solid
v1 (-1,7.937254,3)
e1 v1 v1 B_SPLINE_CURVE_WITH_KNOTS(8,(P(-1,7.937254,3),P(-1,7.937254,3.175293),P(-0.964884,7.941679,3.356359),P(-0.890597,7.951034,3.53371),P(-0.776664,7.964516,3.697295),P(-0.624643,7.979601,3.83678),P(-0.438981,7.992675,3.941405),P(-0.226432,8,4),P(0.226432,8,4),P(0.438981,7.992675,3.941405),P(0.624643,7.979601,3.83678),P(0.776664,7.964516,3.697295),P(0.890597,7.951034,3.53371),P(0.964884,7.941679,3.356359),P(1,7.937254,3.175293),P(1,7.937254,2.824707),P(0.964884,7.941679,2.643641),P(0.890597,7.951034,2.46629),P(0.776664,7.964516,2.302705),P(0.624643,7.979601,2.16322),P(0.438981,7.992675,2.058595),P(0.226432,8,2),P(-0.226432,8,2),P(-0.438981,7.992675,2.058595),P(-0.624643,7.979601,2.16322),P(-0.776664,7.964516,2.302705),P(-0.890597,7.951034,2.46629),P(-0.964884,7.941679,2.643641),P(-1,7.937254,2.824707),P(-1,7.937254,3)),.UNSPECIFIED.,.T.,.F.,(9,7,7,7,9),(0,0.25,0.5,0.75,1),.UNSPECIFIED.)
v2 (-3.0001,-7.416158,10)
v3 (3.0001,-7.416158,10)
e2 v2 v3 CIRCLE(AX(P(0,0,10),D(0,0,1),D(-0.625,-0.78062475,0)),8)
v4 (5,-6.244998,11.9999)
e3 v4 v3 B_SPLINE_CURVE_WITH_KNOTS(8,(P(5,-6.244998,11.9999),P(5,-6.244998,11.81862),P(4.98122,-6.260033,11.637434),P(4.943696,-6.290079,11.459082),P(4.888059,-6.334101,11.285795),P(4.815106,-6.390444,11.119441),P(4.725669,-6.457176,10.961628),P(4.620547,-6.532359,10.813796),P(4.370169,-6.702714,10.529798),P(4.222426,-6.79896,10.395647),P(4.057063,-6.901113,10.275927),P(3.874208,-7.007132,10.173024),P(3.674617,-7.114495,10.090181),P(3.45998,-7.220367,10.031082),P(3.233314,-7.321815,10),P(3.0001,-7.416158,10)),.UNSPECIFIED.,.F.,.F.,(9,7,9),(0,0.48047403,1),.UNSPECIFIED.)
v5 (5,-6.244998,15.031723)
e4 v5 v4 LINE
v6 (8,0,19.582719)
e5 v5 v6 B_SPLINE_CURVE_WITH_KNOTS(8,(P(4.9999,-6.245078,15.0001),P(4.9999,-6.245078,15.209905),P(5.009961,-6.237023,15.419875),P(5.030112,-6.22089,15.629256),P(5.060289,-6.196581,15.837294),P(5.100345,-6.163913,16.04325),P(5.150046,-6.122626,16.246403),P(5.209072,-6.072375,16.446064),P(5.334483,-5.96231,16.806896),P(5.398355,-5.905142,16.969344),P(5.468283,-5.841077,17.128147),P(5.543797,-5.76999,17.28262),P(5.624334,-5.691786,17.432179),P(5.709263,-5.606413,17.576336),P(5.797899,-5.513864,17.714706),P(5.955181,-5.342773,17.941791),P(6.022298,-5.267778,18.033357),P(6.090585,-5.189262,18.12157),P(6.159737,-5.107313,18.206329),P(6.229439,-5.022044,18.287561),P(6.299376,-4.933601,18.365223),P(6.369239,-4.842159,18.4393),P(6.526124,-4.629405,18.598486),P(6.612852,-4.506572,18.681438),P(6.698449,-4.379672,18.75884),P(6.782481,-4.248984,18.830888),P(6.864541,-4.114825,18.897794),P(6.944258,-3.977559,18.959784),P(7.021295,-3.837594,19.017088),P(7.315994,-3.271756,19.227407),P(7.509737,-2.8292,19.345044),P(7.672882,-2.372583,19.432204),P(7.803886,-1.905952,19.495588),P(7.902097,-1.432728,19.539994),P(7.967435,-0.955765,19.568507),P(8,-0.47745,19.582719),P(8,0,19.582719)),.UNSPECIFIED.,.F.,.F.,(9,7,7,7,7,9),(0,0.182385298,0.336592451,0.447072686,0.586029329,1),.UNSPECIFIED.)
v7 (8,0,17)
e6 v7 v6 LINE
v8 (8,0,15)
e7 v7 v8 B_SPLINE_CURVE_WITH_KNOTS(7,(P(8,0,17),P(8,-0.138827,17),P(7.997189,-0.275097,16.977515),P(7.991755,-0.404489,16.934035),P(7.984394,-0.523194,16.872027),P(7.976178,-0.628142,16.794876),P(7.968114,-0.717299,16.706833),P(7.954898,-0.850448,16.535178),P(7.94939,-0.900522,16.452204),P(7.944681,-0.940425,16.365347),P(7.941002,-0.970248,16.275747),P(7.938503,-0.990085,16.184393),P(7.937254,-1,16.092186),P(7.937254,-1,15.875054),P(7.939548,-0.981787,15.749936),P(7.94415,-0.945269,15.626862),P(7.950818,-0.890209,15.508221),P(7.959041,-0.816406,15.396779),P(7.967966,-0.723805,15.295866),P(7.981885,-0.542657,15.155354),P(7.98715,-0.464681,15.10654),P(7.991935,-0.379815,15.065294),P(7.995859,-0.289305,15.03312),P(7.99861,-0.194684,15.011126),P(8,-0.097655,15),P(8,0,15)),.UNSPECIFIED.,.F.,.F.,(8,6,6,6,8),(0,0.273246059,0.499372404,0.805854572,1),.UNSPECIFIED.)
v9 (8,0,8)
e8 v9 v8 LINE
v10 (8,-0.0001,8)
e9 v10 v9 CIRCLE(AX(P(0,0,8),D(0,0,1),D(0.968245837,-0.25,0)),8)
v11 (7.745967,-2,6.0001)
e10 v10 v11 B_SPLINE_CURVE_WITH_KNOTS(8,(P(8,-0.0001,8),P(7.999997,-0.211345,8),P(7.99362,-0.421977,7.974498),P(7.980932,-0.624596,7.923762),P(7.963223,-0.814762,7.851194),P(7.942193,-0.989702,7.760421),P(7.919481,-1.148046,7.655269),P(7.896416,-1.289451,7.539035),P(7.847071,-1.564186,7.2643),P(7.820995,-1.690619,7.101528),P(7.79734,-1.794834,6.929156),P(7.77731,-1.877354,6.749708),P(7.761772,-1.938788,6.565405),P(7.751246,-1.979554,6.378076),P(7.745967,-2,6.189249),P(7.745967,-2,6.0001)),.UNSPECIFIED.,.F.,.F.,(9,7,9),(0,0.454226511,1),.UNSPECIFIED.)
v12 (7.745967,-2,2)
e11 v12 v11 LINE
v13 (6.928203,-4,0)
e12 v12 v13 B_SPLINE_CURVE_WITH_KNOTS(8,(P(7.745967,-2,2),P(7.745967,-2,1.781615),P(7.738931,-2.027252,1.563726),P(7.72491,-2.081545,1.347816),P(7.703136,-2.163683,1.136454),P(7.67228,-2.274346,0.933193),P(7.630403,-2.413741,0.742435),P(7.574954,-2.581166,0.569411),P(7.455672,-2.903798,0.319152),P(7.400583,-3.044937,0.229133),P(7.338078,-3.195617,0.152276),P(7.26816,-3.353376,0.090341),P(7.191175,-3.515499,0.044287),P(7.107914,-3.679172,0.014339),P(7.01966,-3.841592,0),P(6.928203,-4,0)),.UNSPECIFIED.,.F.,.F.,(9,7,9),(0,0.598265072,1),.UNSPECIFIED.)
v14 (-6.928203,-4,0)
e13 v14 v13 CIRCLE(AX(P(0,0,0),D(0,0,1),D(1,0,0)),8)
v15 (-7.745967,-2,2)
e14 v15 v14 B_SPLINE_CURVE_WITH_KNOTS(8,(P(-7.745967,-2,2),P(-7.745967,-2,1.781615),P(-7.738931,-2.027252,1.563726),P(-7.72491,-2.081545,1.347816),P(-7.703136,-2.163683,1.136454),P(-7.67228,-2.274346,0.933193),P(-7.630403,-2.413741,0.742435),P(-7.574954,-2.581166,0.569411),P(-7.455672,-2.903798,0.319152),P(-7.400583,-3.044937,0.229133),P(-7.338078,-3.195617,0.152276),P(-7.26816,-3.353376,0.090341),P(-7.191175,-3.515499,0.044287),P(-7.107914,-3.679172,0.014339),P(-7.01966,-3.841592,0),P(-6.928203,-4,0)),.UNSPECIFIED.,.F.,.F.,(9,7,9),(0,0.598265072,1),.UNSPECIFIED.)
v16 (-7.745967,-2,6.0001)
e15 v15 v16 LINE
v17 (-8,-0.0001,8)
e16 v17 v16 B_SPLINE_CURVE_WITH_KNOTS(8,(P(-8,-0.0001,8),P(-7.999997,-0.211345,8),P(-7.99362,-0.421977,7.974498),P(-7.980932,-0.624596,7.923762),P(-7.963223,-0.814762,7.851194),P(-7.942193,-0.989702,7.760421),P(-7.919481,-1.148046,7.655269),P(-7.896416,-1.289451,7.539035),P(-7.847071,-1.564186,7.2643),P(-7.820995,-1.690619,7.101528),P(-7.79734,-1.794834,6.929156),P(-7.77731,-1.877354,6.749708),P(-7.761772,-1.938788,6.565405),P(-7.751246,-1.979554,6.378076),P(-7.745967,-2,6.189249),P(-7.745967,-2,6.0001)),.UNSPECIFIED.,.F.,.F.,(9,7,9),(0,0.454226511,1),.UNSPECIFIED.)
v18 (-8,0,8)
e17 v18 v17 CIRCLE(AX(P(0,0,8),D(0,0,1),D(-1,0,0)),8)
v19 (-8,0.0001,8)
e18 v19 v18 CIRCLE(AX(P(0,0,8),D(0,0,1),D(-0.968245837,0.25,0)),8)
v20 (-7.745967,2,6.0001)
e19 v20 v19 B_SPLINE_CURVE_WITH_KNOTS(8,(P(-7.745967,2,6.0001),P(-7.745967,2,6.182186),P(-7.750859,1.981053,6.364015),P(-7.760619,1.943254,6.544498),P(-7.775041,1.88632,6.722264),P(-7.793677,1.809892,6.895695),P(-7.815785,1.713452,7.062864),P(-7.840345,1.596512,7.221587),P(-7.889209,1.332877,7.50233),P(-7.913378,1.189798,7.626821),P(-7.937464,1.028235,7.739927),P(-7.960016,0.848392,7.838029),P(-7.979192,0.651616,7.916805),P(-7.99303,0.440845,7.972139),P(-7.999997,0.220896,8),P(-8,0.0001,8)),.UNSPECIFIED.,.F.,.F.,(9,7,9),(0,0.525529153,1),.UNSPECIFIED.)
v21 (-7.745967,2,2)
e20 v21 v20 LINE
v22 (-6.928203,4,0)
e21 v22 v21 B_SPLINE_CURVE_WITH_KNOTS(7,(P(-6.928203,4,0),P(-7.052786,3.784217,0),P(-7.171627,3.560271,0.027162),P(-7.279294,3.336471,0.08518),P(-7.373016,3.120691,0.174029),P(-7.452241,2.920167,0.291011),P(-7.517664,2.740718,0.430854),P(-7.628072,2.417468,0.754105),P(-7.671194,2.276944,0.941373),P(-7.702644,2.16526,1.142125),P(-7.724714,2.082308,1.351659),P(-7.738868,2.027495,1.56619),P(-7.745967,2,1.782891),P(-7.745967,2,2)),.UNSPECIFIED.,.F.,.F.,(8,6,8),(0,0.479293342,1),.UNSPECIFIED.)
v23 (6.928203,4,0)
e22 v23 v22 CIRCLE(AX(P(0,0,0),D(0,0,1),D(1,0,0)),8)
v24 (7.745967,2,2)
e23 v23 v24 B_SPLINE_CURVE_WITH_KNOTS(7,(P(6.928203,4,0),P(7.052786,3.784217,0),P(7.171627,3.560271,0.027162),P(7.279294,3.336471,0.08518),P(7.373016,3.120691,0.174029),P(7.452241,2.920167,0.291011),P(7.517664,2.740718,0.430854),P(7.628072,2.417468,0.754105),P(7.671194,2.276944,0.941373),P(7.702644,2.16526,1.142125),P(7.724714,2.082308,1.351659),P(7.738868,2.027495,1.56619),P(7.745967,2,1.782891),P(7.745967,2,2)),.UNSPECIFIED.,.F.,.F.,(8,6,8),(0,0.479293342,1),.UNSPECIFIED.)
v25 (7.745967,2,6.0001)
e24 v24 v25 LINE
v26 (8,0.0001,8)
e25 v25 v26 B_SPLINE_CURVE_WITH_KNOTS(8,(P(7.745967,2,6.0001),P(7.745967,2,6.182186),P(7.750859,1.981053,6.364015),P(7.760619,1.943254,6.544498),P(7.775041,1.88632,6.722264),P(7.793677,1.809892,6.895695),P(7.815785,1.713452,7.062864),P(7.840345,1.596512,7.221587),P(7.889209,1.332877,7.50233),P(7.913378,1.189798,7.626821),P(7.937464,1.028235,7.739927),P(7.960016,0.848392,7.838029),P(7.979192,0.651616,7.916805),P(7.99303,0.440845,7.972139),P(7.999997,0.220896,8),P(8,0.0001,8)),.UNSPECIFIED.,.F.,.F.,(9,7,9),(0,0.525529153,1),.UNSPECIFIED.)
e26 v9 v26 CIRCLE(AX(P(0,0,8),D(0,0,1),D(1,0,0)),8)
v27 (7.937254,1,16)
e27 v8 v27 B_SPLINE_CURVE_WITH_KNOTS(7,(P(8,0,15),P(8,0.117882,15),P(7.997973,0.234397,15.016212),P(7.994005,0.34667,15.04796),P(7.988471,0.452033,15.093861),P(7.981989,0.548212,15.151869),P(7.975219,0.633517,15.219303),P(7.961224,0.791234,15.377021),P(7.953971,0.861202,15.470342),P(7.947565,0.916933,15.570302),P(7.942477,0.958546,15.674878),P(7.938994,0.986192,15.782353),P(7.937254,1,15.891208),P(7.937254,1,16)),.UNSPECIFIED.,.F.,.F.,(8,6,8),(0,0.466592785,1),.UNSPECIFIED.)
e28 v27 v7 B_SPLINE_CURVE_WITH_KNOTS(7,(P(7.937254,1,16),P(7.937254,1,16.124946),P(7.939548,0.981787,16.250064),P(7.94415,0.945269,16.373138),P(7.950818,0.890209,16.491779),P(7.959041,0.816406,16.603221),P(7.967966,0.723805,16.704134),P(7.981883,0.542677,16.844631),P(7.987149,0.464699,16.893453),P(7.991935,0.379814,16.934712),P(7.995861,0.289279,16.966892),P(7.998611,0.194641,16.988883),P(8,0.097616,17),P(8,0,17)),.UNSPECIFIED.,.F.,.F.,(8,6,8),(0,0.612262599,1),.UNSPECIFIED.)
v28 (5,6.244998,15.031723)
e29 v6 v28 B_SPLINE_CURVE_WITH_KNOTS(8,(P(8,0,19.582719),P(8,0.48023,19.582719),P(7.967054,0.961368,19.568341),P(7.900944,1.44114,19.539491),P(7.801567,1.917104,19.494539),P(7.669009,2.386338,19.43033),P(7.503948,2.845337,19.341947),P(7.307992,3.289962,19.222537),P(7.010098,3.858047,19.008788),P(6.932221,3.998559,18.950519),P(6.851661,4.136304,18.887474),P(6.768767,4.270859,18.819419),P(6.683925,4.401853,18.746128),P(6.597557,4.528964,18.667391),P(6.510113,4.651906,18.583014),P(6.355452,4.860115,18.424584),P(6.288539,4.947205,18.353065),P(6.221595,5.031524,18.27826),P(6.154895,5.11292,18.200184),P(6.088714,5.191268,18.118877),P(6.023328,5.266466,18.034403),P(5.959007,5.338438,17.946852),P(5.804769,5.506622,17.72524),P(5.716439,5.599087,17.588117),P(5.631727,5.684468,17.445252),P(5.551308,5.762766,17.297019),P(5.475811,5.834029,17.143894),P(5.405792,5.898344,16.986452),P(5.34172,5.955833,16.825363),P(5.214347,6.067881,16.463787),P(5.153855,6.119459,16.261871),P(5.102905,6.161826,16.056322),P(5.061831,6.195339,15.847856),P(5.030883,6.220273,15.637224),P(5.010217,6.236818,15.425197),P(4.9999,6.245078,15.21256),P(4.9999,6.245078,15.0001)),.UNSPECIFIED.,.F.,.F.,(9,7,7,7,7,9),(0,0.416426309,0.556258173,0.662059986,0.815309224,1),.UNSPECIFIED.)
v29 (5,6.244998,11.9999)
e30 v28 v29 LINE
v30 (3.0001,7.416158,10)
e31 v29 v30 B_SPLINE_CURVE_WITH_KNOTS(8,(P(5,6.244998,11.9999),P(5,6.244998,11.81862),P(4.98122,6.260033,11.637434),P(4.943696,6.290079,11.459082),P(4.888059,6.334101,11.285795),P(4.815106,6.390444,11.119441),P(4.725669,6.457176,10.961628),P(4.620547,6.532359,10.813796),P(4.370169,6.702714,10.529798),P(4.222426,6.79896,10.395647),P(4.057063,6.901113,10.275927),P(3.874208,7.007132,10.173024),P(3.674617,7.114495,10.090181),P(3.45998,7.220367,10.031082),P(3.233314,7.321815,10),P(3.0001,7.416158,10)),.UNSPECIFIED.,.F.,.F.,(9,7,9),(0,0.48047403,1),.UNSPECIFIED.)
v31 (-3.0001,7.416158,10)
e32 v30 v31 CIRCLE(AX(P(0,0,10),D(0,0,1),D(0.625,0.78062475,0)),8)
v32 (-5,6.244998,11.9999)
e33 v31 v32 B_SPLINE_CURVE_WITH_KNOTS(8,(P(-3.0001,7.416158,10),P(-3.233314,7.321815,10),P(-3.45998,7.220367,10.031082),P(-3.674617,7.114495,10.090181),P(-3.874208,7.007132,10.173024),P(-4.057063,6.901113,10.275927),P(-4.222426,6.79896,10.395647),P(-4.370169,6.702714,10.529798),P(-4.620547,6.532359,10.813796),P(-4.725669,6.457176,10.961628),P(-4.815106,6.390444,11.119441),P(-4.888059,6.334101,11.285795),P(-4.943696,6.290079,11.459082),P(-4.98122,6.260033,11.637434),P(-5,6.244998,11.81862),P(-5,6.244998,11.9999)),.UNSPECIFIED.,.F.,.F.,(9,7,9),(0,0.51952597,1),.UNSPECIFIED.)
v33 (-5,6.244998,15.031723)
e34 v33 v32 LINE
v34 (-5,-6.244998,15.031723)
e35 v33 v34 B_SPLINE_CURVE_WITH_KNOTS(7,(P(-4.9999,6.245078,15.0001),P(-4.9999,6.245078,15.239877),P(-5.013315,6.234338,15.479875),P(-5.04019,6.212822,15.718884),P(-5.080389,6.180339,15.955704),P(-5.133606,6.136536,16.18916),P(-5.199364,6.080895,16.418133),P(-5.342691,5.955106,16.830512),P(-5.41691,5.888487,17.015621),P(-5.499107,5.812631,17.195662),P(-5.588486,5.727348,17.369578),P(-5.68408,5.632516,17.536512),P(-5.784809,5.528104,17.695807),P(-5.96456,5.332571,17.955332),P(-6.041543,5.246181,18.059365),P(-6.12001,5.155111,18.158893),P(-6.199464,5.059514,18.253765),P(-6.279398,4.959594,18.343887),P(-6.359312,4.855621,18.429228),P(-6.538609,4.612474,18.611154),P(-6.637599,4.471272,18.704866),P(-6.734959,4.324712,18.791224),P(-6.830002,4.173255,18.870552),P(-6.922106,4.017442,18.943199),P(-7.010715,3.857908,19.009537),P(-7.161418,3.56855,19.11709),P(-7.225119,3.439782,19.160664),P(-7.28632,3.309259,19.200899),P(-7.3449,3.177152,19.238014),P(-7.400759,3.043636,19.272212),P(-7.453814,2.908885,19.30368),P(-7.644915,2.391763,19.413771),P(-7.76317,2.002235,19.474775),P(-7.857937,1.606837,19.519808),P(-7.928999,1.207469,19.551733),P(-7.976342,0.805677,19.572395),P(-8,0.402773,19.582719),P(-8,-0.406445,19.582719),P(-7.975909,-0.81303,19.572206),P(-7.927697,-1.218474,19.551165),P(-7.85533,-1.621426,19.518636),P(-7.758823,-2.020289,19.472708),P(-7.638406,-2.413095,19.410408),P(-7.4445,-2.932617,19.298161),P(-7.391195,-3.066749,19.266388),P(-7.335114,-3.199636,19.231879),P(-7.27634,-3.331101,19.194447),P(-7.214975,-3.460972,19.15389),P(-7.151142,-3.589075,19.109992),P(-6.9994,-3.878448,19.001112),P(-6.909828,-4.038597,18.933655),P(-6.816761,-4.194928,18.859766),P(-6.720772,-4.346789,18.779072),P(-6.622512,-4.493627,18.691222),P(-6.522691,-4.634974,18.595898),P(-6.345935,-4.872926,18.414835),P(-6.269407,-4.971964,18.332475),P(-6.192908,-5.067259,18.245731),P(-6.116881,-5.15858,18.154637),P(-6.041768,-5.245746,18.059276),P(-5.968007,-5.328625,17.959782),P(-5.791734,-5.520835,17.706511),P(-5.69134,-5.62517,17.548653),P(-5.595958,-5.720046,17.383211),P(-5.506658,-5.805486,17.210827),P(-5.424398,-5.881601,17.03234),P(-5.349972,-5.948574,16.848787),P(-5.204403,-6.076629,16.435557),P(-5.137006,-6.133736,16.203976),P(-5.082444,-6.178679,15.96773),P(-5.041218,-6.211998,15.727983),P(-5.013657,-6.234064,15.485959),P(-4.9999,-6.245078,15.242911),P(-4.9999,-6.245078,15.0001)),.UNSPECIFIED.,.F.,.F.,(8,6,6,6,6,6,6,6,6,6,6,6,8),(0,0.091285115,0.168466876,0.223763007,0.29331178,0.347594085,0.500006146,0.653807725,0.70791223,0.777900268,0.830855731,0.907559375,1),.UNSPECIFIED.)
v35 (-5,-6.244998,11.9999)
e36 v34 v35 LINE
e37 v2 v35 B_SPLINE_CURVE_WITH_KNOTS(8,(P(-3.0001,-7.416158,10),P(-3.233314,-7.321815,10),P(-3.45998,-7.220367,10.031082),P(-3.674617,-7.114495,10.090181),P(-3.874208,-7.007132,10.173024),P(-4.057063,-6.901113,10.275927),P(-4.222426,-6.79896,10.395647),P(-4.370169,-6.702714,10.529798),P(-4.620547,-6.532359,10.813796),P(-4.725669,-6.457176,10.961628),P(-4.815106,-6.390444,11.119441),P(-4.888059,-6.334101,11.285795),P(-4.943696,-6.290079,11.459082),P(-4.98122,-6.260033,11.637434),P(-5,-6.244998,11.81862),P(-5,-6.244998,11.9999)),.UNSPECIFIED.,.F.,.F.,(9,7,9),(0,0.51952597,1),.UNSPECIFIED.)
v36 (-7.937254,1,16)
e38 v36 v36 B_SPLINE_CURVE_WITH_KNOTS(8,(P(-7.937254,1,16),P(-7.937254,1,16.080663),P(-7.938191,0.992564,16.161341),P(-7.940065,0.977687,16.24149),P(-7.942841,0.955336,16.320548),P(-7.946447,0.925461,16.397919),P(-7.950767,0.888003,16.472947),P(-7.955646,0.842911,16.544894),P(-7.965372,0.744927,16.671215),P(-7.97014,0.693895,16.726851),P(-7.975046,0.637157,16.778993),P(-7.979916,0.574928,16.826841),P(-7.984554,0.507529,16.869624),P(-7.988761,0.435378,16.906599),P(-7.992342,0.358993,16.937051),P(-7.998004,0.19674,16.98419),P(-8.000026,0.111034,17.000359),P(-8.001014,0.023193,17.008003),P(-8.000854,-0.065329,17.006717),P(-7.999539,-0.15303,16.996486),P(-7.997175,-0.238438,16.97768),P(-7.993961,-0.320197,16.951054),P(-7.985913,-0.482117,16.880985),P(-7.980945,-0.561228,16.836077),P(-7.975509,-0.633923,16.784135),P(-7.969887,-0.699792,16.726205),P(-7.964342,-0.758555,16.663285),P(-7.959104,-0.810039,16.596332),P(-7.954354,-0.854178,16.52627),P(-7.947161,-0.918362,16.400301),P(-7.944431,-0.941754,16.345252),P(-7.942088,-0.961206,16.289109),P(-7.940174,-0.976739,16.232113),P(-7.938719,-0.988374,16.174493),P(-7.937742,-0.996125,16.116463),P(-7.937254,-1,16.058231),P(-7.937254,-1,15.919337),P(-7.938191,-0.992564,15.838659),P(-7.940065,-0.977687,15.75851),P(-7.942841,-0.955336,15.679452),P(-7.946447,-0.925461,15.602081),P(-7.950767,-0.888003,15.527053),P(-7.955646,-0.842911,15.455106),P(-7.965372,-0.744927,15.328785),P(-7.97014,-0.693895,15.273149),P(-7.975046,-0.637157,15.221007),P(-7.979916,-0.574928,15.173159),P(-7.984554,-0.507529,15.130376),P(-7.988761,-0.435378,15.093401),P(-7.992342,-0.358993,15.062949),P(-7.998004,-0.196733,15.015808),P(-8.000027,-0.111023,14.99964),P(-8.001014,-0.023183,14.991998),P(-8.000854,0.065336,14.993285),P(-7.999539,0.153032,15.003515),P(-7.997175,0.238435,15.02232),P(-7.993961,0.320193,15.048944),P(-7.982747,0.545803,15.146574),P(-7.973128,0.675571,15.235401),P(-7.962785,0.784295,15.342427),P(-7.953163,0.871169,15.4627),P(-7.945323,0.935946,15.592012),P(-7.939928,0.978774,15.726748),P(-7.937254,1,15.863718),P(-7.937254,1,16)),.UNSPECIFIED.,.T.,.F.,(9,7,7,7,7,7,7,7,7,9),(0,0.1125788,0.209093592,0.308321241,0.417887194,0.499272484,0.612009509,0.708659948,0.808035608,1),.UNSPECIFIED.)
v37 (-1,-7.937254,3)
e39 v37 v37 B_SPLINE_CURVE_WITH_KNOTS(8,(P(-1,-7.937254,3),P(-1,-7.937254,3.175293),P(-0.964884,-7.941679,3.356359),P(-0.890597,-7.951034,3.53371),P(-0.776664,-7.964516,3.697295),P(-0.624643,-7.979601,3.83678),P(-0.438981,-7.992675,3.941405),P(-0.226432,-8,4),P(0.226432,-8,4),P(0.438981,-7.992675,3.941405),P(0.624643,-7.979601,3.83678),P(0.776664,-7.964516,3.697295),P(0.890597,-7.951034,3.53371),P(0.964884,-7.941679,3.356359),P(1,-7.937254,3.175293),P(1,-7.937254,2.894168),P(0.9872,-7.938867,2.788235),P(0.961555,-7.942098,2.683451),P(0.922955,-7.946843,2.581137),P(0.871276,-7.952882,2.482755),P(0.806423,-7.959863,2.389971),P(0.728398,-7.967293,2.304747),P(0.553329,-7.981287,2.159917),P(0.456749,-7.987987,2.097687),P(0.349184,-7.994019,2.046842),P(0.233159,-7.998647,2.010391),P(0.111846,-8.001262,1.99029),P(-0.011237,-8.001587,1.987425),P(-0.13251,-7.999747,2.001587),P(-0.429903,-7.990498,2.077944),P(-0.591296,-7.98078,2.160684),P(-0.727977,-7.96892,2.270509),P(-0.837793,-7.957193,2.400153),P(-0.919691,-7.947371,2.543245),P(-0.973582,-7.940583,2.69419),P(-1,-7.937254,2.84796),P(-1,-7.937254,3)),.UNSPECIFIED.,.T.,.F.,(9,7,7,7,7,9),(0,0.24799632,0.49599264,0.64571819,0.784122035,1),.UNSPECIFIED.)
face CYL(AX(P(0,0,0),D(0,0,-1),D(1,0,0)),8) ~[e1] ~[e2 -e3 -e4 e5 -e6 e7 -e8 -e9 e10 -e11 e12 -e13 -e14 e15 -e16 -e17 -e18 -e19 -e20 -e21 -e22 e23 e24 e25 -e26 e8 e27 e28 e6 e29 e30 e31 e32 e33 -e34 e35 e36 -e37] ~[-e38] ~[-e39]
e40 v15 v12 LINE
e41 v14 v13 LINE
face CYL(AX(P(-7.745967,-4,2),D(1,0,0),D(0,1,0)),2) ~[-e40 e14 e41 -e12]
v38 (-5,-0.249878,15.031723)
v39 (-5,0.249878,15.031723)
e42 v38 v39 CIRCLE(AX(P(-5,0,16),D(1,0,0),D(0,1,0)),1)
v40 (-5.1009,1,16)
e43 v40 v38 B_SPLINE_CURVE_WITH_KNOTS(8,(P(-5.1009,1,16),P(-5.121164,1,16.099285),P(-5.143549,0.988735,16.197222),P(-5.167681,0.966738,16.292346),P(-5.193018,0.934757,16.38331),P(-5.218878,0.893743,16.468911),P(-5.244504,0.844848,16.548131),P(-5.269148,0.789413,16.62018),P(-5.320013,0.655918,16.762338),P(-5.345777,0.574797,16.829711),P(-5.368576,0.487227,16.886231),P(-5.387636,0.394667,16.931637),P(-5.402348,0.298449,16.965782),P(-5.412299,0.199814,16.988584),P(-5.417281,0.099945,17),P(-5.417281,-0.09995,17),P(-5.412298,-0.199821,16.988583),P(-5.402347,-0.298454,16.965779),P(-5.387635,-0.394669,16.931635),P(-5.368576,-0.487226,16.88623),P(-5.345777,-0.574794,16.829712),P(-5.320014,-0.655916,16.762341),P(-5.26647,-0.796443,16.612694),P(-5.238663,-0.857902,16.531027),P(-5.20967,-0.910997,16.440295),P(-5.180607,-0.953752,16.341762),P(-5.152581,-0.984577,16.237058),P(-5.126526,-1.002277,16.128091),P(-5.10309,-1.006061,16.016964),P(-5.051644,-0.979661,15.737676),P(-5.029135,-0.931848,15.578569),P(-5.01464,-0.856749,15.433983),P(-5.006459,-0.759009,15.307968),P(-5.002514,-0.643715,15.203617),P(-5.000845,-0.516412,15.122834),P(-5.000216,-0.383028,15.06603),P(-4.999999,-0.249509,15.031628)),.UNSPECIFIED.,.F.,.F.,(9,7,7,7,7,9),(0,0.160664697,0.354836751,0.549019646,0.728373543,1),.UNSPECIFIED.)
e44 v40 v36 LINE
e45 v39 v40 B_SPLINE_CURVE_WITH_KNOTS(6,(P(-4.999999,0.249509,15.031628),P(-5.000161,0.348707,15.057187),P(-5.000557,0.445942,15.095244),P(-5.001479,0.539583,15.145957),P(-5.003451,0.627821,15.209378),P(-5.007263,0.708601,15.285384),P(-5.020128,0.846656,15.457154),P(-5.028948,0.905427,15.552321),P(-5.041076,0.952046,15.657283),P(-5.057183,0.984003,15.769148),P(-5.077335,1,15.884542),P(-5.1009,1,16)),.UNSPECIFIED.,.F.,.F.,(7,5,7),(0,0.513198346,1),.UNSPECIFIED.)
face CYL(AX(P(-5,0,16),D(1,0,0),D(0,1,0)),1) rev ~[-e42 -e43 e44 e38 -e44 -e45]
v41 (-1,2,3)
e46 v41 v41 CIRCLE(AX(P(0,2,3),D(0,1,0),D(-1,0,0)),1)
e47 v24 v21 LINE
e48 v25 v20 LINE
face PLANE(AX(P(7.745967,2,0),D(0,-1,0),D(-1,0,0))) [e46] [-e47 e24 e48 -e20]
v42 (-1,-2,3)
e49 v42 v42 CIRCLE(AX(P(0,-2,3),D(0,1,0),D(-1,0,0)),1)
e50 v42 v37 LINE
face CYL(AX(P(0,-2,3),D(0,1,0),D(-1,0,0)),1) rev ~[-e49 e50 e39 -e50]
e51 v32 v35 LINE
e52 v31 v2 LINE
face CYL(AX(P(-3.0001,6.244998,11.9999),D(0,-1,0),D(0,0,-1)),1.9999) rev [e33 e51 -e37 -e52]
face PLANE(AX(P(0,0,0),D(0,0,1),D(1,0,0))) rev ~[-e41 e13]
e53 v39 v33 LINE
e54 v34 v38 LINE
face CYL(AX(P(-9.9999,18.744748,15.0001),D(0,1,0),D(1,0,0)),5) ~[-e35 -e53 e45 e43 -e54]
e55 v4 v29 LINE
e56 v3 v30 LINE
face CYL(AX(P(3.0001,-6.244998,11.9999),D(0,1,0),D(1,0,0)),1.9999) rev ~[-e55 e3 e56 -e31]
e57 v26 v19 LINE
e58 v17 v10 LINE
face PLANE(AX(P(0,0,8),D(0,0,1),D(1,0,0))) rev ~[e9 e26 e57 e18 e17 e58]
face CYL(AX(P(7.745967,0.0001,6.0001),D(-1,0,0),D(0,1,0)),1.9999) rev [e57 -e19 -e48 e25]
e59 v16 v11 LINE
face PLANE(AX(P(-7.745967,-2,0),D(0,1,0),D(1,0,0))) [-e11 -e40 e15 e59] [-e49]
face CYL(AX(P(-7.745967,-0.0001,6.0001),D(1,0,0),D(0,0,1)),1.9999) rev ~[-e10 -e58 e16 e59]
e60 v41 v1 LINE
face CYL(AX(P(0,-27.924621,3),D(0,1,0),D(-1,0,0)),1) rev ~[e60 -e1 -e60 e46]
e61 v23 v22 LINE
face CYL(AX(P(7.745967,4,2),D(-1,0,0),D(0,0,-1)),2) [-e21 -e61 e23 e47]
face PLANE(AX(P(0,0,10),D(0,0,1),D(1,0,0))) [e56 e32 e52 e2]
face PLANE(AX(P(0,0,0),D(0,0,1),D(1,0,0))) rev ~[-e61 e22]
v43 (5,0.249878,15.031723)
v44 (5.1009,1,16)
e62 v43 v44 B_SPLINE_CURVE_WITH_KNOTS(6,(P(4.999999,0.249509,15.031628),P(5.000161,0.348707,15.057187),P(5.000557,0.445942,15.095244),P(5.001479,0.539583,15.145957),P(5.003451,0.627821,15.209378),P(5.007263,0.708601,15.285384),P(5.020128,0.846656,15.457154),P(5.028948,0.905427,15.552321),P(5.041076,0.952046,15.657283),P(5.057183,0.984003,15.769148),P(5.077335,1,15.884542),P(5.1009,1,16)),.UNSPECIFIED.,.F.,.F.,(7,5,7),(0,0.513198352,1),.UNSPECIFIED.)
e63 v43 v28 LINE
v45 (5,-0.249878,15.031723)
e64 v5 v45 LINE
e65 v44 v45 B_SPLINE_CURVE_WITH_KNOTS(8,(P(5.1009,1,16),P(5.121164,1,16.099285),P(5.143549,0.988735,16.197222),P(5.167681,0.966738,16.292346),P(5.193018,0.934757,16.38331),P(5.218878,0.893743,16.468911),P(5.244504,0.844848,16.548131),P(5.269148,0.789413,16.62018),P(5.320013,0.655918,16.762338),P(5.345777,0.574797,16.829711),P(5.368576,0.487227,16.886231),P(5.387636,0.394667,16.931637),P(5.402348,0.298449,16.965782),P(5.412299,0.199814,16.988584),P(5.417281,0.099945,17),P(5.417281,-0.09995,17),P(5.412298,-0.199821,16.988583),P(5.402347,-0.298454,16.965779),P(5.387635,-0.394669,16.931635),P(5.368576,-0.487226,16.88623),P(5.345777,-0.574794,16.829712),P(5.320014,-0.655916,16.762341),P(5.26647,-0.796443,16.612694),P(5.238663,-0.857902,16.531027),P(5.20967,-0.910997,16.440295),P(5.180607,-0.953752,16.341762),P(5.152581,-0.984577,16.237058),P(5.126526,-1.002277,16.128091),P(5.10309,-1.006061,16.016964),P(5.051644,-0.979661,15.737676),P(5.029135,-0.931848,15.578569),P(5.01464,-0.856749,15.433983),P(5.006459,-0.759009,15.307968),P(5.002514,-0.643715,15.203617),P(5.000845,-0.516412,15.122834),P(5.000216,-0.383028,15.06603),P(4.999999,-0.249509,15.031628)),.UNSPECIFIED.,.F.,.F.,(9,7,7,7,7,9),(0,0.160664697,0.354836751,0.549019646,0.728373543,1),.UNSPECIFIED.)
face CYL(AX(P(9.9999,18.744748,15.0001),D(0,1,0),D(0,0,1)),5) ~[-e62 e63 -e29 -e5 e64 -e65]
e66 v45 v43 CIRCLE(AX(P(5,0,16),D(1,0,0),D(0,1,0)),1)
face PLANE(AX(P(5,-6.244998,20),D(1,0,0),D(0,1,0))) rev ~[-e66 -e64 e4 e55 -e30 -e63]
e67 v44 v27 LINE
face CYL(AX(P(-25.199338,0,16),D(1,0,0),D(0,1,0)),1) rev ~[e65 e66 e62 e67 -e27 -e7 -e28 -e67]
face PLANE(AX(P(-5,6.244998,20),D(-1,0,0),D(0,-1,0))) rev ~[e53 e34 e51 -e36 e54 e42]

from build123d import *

# Parameters (mm, degrees)
F0_R         = 8
F1_DEPTH     = 20
F3_DEPTH     = 10
F5_DEPTH     = 8
F7_D         = 2
F7_DEPTH     = 3.001
F9_D         = 2
F10_T1_DEPTH = 37.4894960018
F12_D        = 2
F12_DEPTH    = 6.0010001
F14_D        = 2
F15_R        = 2
F16_R        = 1.9999


# Not quite as in the source:
# - a fillet or chamfer that OpenCascade refuses, or shapes differently, is made with other operations: its cross-section is extruded or revolved along the edge and cut away or added
# - a fillet or chamfer is up to 0.001 mm smaller than in the source, because OpenCascade refuses the exact size


with BuildPart() as f1:
    # F0 (on Top) → F1 (new body)
    with BuildSketch(Plane.XY):
        Circle(F0_R)
    extrude(amount=F1_DEPTH)

    # F2 (on face) → F3 (cut)
    with BuildSketch(Plane.XY.offset(20)):
        with BuildLine():
            ThreePointArc((5, 6.2449979984), (0, 8), (-5, 6.2449979984))
            Line((-5, 6.2449979984), (-5, -6.2449979984))
            ThreePointArc((-5, -6.2449979984), (0, -8), (5, -6.2449979984))
            Line((5, -6.2449979984), (5, 6.2449979984))
        make_face()
    extrude(amount=-F3_DEPTH, mode=Mode.SUBTRACT)

    # F4 (on face) → F5 (cut)
    with BuildSketch(Plane.XY):
        with BuildLine():
            ThreePointArc((8, 0), (7.9362375701, 1.0080343399), (7.7459666924, 2))
            Line((7.7459666924, 2), (-7.7459666924, 2))
            ThreePointArc((-7.7459666924, 2), (-7.9362375701, 1.0080343399), (-8, 0))
            ThreePointArc((-8, 0), (-7.9362375701, -1.0080343399), (-7.7459666924, -2))
            Line((-7.7459666924, -2), (7.7459666924, -2))
            ThreePointArc((7.7459666924, -2), (7.9362375701, -1.0080343399), (8, 0))
        make_face()
    extrude(amount=F5_DEPTH, mode=Mode.SUBTRACT)

    # F7 (through all, one way)
    with BuildSketch(Plane.YZ.offset(-5)):
        with Locations((0, 16)):
            Circle(F7_D / 2)
    extrude(amount=-F7_DEPTH, mode=Mode.SUBTRACT)

    # F9 (through all)
    with Locations(Plane(origin=(5, 0, 0), x_dir=(0, -1, 0), z_dir=(-1, 0, 0))):
        with Locations((0, 16)):
            Hole(F9_D / 2)

    # F10: fillet of radius 5 on 2 edges, made by hand

    # F10_s2 → F10_t1 (cut)
    with BuildSketch(Plane.XZ.offset(-18.7447480009)):
        with BuildLine():
            ThreePointArc((9.9999, 20.0001), (6.4643660941, 18.5356339059), (4.9999, 15.0001))
            Line((4.9999, 15.0001), (4.8999, 15.0001))
            ThreePointArc((4.8999, 15.0001), (4.9, 17.50005), (4.9, 20))
            Line((4.9, 20), (5, 20.1))
            ThreePointArc((5, 20.1), (7.49995, 20.1), (9.9999, 20.1001))
            Line((9.9999, 20.1001), (9.9999, 20.0001))
        make_face()
        with BuildLine():
            ThreePointArc((-4.9999, 15.0001), (-6.4643660941, 18.5356339059), (-9.9999, 20.0001))
            Line((-9.9999, 20.0001), (-9.9999, 20.1001))
            ThreePointArc((-9.9999, 20.1001), (-7.49995, 20.1), (-5, 20.1))
            Line((-5, 20.1), (-4.9, 20))
            ThreePointArc((-4.9, 20), (-4.9, 17.50005), (-4.8999, 15.0001))
            Line((-4.8999, 15.0001), (-4.9999, 15.0001))
        make_face()
    extrude(amount=F10_T1_DEPTH, mode=Mode.SUBTRACT)

    # F12 (through all, one way)
    with BuildSketch(Plane(origin=(0, -2, 0), x_dir=(-1, 0, 0), z_dir=(0, 1, 0))):
        with Locations((0, 3)):
            Circle(F12_D / 2)
    extrude(amount=-F12_DEPTH, mode=Mode.SUBTRACT)

    # F14 (through all)
    with Locations(Plane.XZ.offset(-2)):
        with Locations((0, 3)):
            Hole(F14_D / 2)

    # F15
    f15_edges = [f1.edges().sort_by_distance(p)[0] for p in [
        (0, 2, 0),
        (0, -2, 0),
    ]]
    fillet(f15_edges, radius=F15_R)

    # F16 (radius 2 in the source; OpenCascade refuses exactly that, so slightly less here)
    f16_edges = [f1.edges().sort_by_distance(p)[0] for p in [
        (-5, 0, 10),
        (5, 0, 10),
        (0, 2, 8),
        (0, -2, 8),
    ]]
    fillet(f16_edges, radius=F16_R)


solid = f1.part
